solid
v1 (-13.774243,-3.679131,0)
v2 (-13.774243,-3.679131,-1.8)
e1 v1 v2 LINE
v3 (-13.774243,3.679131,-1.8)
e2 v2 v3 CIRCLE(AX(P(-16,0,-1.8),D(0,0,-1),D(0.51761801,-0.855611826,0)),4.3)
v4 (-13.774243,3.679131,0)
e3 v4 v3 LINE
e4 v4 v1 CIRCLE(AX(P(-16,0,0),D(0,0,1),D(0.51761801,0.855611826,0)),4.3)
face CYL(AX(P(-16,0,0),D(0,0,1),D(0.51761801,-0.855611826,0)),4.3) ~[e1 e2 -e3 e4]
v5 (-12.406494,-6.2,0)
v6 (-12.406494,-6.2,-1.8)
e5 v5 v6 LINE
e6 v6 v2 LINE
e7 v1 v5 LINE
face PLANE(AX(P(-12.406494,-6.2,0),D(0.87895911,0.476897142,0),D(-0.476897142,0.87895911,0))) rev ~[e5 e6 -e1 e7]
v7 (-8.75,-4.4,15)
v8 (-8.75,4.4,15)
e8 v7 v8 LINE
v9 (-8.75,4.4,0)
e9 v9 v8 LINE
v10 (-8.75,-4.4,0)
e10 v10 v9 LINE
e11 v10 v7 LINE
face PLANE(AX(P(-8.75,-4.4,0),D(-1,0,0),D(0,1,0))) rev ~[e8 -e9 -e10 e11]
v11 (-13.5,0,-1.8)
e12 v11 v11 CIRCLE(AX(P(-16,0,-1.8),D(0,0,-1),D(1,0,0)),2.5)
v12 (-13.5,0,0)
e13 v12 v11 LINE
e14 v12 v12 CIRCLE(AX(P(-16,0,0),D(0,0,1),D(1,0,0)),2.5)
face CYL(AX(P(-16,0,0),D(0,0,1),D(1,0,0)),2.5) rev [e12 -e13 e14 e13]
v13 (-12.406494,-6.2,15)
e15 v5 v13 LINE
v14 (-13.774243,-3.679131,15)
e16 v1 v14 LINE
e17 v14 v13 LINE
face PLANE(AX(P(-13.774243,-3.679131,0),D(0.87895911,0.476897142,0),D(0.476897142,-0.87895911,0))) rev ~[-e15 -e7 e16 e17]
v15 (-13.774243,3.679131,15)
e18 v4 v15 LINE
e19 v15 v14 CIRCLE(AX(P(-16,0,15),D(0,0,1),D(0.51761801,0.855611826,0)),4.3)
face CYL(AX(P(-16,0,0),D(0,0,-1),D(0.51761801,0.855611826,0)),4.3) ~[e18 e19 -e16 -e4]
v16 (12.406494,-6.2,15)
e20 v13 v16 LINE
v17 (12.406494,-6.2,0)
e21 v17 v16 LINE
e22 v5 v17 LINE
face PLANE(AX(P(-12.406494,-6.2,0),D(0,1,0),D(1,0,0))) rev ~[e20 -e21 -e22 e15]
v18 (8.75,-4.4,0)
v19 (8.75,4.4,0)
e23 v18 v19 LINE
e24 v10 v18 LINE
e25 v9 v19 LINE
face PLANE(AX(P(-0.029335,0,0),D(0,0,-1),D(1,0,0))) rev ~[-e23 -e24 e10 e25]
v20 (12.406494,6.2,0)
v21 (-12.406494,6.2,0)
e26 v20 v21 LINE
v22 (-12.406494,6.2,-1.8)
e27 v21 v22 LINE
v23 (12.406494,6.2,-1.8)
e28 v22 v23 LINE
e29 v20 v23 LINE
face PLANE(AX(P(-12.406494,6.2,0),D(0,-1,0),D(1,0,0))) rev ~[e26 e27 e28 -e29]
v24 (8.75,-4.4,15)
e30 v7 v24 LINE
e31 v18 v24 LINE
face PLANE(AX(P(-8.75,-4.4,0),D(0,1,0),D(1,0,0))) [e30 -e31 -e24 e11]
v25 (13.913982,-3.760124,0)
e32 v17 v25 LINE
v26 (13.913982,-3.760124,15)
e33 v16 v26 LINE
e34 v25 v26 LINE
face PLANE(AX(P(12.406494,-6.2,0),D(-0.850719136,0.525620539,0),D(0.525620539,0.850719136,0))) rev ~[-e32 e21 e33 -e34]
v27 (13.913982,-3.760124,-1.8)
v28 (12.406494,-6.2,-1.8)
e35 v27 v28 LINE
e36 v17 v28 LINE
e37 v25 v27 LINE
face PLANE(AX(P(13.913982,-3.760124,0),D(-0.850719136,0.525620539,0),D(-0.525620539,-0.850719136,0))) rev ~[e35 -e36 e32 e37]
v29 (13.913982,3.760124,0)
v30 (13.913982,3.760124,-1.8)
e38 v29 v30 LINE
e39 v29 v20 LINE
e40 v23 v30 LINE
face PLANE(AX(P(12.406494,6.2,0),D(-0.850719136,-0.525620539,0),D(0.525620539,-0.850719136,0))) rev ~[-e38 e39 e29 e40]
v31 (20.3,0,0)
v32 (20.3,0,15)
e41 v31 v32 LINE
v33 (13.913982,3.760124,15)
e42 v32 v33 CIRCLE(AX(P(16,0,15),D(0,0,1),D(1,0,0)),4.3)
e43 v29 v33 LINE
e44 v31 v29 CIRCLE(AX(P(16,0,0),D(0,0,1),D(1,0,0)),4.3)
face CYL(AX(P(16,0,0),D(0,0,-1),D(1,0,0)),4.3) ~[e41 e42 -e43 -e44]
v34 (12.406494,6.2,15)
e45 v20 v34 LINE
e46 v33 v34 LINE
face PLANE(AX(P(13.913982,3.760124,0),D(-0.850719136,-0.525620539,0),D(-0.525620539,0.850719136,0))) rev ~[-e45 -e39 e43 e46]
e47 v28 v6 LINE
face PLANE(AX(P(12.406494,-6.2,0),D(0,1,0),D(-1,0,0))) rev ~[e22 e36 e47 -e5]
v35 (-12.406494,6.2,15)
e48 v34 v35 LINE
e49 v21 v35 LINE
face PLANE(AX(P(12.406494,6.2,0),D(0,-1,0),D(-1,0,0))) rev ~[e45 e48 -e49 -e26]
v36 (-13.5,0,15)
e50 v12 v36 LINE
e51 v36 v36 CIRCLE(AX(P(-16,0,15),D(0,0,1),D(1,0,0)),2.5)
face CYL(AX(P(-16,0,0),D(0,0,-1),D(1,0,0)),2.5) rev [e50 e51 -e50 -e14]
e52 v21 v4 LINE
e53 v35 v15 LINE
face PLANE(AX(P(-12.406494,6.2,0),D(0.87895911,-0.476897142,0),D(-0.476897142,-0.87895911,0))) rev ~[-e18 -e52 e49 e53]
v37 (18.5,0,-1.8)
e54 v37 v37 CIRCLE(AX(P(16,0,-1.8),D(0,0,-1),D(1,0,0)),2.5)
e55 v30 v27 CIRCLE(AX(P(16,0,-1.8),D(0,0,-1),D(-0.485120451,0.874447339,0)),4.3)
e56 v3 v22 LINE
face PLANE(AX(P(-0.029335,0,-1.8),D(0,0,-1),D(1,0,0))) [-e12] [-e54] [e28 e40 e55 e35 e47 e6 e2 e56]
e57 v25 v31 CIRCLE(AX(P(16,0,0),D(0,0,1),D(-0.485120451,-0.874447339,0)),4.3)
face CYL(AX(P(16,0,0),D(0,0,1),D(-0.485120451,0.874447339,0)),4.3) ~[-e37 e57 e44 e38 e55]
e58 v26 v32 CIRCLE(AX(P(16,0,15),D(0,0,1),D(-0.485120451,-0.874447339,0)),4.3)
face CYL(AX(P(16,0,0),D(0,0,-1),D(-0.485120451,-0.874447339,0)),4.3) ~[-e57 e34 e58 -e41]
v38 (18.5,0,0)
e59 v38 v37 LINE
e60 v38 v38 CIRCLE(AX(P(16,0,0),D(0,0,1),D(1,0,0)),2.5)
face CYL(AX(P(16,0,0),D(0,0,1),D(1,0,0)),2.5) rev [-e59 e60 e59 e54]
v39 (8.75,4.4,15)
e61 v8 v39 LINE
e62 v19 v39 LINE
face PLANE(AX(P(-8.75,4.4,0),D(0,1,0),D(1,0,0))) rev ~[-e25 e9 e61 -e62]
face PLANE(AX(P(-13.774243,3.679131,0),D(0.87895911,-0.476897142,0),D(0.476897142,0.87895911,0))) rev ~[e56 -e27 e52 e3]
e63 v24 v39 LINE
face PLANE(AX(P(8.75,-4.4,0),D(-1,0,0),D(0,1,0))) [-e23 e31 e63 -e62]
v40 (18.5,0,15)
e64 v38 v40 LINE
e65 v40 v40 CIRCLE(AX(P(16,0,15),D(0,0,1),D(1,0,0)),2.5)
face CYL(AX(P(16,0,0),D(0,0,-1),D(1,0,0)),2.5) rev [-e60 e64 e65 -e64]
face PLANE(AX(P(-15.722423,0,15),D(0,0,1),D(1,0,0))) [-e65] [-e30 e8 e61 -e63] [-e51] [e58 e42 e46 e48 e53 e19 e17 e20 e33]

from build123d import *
from build123d import SkipClean  # not in build123d's __all__

# Parameters (mm, degrees)
F2_R     = 2.5
F2_W     = 17.5
F2_H     = 8.8
F3_DEPTH = 15
F4_R     = 2.5
F4_W     = 17.5
F4_H     = 8.8
F5_DEPTH = 1.8


with BuildPart() as f3:
    # F2 (on Top) → F3 (new body)
    with BuildSketch(Plane.XY):
        with BuildLine():
            ThreePointArc((-13.7742425586, -3.6791308501), (-12.2542853153, -2.1117815941), (-11.7, 0))
            ThreePointArc((-11.7, 0), (-12.2542853153, 2.1117815941), (-13.7742425586, 3.6791308501))
            ThreePointArc((-13.7742425586, 3.6791308501), (-20.3, 0), (-13.7742425586, -3.6791308501))
        make_face()
        with Locations((-16, 0)):
            Circle(F2_R, mode=Mode.SUBTRACT)
        with BuildLine():
            ThreePointArc((-13.7742425586, 3.6791308501), (-12.2542853153, 2.1117815941), (-11.7, 0))
            ThreePointArc((-11.7, 0), (-12.2542853153, -2.1117815941), (-13.7742425586, -3.6791308501))
            Line((-13.7742425586, -3.6791308501), (-12.4064937305, -6.2))
            Line((-12.4064937305, -6.2), (0, -6.2))
            Line((0, -6.2), (12.4064937305, -6.2))
            Line((12.4064937305, -6.2), (13.913982062, -3.7601235568))
            ThreePointArc((13.913982062, -3.7601235568), (11.7, 0), (13.913982062, 3.7601235568))
            Line((13.913982062, 3.7601235568), (12.4064937305, 6.2))
            Line((12.4064937305, 6.2), (0, 6.2))
            Line((0, 6.2), (-12.4064937305, 6.2))
            Line((-12.4064937305, 6.2), (-13.7742425586, 3.6791308501))
        make_face()
        Rectangle(F2_W, F2_H, mode=Mode.SUBTRACT)
        with BuildLine():
            ThreePointArc((20.3, 0), (18.1817565019, 3.705393173), (13.913982062, 3.7601235568))
            ThreePointArc((13.913982062, 3.7601235568), (11.7, 0), (13.913982062, -3.7601235568))
            ThreePointArc((13.913982062, -3.7601235568), (18.1817565019, -3.705393173), (20.3, 0))
        make_face()
        with Locations((16, 0)):
            Circle(F2_R, mode=Mode.SUBTRACT)
    extrude(amount=F3_DEPTH)

    # F4 (on face) → F5 (join)
    with BuildSketch(Plane(origin=(0, 0, 0), x_dir=(1, 0, 0), z_dir=(0, 0, -1))):
        with BuildLine():
            Line((-12.4064937305, 6.2), (-13.7742425586, 3.6791308501))
            ThreePointArc((-13.7742425586, 3.6791308501), (-20.3, 0), (-13.7742425586, -3.6791308501))
            Line((-13.7742425586, -3.6791308501), (-12.4064937305, -6.2))
            Line((-12.4064937305, -6.2), (12.4064937305, -6.2))
            Line((12.4064937305, -6.2), (13.913982062, -3.7601235568))
            ThreePointArc((13.913982062, -3.7601235568), (20.3, 0), (13.913982062, 3.7601235568))
            Line((13.913982062, 3.7601235568), (12.4064937305, 6.2))
            Line((12.4064937305, 6.2), (-12.4064937305, 6.2))
        make_face()
        with Locations((-16, 0)):
            Circle(F4_R, mode=Mode.SUBTRACT)
        Rectangle(F4_W, F4_H, mode=Mode.SUBTRACT)
        with Locations((16, 0)):
            Circle(F4_R, mode=Mode.SUBTRACT)
        Rectangle(F4_W, F4_H)
    with SkipClean():  # cleaning this boolean's faces spoils the solid; the shape is the same uncleaned
        extrude(amount=F5_DEPTH)


solid = f3.part
